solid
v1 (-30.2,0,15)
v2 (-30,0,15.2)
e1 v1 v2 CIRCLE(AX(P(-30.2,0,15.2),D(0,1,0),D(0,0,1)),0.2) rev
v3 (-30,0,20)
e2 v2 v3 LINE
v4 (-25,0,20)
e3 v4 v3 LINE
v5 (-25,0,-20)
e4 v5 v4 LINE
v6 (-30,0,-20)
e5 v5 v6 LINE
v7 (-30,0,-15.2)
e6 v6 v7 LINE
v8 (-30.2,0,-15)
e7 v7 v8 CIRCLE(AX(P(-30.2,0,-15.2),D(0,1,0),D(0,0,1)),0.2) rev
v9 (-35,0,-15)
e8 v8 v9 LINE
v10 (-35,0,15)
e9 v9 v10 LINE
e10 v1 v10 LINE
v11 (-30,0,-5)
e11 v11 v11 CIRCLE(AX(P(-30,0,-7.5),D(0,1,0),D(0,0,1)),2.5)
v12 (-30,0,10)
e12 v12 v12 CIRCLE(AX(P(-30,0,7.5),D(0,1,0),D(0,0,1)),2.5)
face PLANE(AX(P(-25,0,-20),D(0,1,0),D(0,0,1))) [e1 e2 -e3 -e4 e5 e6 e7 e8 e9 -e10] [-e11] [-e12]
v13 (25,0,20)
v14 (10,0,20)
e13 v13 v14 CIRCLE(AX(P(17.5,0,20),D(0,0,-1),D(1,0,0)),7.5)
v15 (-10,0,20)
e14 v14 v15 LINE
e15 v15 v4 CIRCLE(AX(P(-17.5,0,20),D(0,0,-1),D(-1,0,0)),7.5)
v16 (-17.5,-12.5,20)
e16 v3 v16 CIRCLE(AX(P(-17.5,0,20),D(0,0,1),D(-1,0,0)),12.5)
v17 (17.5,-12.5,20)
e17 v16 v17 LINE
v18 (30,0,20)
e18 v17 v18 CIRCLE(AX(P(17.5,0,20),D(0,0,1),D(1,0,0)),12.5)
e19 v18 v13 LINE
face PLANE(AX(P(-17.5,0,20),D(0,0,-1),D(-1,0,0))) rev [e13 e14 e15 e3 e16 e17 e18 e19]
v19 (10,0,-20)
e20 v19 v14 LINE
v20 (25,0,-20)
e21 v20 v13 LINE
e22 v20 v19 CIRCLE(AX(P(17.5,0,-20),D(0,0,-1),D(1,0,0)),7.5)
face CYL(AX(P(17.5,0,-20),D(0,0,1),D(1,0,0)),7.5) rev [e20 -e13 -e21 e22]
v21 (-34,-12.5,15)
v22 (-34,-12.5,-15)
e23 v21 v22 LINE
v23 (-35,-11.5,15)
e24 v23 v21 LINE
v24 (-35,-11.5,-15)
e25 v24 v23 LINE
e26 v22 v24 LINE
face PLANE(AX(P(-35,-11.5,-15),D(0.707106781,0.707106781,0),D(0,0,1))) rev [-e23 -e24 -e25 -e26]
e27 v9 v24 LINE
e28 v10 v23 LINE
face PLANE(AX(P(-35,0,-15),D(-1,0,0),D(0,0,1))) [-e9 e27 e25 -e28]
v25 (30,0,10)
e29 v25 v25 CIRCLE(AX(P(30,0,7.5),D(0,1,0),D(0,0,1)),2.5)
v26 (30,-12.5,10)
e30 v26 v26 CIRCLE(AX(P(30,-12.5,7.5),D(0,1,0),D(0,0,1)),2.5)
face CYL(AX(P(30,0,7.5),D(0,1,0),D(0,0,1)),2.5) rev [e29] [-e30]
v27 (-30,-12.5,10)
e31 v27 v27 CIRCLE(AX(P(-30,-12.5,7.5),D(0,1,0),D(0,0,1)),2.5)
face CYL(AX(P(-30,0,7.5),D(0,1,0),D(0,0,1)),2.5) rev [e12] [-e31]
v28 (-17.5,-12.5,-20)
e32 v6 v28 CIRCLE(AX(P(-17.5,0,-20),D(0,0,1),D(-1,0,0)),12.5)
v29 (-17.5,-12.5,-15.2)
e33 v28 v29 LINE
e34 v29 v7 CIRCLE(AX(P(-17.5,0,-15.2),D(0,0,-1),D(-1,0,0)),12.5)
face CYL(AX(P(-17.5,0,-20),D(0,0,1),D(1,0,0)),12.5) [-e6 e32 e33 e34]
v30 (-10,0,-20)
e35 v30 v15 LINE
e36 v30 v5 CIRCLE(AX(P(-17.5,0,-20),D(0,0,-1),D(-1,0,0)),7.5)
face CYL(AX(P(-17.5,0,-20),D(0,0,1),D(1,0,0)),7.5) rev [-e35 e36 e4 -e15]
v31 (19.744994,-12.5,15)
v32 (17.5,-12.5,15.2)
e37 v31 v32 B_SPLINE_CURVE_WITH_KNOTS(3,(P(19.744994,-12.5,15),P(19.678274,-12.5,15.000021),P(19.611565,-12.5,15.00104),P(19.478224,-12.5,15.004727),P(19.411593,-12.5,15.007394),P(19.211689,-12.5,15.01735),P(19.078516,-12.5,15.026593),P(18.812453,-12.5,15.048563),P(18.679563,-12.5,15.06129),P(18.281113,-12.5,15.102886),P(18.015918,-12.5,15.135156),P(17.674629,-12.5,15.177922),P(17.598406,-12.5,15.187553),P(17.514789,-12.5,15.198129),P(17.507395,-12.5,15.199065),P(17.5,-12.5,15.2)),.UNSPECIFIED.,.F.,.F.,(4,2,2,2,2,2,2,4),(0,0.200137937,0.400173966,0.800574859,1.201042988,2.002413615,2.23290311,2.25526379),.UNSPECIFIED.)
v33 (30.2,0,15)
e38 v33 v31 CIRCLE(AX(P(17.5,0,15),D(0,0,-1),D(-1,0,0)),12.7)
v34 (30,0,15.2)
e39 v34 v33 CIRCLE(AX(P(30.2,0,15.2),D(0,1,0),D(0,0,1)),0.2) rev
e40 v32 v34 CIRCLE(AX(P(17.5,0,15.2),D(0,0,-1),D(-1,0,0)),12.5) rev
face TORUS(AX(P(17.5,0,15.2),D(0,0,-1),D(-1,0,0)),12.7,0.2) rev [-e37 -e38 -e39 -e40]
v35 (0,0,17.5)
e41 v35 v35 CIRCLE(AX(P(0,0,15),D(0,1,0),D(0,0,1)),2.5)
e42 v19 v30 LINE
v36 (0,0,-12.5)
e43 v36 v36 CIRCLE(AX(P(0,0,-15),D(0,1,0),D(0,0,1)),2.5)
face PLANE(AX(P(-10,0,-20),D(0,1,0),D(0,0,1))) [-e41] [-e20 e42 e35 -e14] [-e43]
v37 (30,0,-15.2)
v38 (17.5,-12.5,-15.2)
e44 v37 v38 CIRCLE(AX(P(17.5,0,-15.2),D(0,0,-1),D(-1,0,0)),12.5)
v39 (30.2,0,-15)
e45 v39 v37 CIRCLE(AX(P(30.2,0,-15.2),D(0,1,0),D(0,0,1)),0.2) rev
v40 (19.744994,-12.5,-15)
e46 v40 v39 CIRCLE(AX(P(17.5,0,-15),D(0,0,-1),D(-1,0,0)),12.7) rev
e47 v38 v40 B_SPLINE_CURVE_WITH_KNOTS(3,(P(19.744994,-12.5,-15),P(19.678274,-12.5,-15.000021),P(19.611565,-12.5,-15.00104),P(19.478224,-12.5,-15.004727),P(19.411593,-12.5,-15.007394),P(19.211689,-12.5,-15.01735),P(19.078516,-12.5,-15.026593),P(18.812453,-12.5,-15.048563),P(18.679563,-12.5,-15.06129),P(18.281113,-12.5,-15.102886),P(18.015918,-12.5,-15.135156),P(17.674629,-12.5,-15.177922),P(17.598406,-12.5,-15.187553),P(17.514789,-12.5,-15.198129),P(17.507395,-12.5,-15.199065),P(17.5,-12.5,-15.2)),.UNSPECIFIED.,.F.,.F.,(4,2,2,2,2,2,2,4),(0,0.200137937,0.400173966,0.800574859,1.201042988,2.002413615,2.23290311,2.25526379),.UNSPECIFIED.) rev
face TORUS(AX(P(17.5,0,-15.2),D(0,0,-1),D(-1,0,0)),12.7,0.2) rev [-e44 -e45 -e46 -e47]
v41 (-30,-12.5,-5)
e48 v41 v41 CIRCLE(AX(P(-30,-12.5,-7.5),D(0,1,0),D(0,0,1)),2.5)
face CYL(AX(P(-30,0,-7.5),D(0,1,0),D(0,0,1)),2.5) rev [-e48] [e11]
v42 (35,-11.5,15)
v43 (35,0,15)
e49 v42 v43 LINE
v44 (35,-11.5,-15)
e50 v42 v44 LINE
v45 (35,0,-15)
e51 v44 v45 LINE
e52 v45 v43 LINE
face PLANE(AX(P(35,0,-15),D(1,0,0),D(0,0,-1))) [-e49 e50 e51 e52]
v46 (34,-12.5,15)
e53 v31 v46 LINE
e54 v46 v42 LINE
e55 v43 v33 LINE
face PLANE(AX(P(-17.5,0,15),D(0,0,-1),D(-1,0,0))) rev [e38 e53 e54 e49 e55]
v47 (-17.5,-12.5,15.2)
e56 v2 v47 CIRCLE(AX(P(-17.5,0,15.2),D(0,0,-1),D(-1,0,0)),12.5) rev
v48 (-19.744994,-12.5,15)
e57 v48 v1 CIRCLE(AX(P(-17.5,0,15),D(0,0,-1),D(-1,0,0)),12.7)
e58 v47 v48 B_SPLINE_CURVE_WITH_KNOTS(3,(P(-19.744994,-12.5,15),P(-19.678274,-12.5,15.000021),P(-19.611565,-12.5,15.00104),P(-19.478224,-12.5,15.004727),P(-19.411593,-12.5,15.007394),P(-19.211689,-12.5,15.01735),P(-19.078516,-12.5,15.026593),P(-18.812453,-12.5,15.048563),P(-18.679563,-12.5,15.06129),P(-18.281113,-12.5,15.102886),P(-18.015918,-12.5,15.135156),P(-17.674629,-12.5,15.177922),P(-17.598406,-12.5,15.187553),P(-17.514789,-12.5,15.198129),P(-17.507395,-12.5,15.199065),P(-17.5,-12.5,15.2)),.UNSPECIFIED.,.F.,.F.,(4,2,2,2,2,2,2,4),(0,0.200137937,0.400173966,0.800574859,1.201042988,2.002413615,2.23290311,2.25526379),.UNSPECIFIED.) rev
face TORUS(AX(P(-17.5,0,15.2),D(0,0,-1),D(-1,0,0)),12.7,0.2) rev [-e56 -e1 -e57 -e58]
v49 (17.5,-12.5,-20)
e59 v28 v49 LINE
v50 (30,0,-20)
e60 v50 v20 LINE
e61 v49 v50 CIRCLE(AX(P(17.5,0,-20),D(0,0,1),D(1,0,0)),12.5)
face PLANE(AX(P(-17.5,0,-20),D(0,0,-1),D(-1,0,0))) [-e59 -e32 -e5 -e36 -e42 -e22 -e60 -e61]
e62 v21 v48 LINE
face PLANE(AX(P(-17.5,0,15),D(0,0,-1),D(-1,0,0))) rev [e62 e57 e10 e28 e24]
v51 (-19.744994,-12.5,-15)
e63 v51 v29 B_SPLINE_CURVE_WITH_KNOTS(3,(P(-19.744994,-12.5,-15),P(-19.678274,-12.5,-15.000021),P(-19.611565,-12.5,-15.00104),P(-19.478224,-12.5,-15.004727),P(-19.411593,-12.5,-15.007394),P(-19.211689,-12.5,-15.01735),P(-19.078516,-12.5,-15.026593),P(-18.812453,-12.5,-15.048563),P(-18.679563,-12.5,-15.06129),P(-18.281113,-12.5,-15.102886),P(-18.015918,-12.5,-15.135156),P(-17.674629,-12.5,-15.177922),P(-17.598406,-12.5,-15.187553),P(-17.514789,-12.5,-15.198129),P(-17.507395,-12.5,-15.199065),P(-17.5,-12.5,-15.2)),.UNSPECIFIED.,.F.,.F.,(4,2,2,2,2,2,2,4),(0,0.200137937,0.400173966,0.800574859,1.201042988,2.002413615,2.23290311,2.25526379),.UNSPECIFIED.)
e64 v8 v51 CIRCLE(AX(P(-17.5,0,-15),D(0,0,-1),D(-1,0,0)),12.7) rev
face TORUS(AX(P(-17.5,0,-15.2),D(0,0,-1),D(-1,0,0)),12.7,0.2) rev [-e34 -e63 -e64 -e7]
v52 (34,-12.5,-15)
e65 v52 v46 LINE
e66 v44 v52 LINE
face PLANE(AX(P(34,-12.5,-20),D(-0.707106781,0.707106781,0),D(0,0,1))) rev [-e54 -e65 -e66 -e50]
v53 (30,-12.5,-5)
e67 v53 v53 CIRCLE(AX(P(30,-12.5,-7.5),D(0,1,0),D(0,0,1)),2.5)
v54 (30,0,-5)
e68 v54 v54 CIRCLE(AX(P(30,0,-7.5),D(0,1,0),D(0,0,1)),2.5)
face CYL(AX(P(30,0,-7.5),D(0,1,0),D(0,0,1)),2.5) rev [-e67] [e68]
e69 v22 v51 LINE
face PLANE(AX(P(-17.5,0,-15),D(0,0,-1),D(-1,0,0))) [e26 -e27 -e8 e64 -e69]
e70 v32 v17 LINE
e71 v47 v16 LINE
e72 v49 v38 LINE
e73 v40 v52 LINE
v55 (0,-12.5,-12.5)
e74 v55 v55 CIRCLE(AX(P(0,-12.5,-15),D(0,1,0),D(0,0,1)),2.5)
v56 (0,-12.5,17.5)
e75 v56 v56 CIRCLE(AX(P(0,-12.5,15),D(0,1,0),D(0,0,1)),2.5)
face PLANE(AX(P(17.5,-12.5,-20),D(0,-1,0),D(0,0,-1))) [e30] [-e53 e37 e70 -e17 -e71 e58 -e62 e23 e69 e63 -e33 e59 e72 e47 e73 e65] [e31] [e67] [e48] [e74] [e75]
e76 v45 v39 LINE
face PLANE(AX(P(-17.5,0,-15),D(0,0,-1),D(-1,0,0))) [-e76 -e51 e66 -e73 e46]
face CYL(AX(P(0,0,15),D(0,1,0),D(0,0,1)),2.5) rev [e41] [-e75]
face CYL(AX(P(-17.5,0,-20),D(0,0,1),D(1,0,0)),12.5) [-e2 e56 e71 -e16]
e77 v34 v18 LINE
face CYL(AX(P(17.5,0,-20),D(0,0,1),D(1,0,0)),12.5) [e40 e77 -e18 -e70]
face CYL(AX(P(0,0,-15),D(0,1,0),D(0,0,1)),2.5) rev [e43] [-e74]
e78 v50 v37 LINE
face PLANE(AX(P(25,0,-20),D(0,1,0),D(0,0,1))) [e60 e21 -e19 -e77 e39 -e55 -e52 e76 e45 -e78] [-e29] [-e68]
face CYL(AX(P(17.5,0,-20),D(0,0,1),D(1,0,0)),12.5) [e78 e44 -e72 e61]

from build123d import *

# Parameters (mm, degrees)
EXTRUDE_1_DEPTH      = 20
EXTRUDE_1_DEPTH_BACK = 20
EXTRUDE_2_DEPTH      = 15
EXTRUDE_2_DEPTH_BACK = 15
CHAMFER_1_SIZE       = 1
HOLE_WIZARD_5_0_1_D  = 5
FILLET_1_R           = 0.2


with BuildPart() as part:
    # Эскиз1 → Бобышка-Вытянуть1 (new, two sides: drawn at the far end of the back side and taken through both)
    with BuildSketch(Plane.XY.offset(-EXTRUDE_1_DEPTH_BACK)):
        with BuildLine():
            Line((17.5, -12.5), (-17.5, -12.5))
            ThreePointArc((-17.5, -12.5), (-26.338834764831844, -8.838834764831844), (-30.000000000000004, 0))
            Line((-30.000000000000004, 0), (-25, 0))
            ThreePointArc((-25, 0), (-17.5, -7.499999999999998), (-10.000000000000002, 0))
            Line((-10.000000000000002, 0), (10.000000000000002, 0))
            ThreePointArc((10.000000000000002, 0), (17.5, -7.499999999999998), (25, 0))
            Line((25, 0), (30.000000000000004, 0))
            ThreePointArc((30.000000000000004, 0), (26.338834764831844, -8.838834764831843), (17.5, -12.5))
        make_face()
    extrude(amount=EXTRUDE_1_DEPTH + EXTRUDE_1_DEPTH_BACK)

    # Эскиз2 → Бобышка-Вытянуть2 (add, two sides: drawn at the far end of the back side and taken through both)
    with BuildSketch(Plane.XY.offset(-EXTRUDE_2_DEPTH_BACK)):
        with BuildLine():
            Line((30.000000000000004, 0), (35, 0))
            Line((35, 0), (35, -12.499999999999996))
            Line((35, -12.499999999999996), (17.5, -12.5))
            Line((17.5, -12.5), (-17.500000000000004, -12.5))
            Line((-17.500000000000004, -12.5), (-35, -12.499999999999996))
            Line((-35, -12.499999999999996), (-35, 0))
            Line((-35, 0), (-30.000000000000004, 1.53e-15))
            Line((-30.000000000000004, 1.53e-15), (-25, 9.2e-16))
            ThreePointArc((-25, 9.2e-16), (-17.5, -7.499999999999998), (-10.000000000000002, 0))
            Line((-10.000000000000002, 0), (10.000000000000002, 9.2e-16))
            ThreePointArc((10.000000000000002, 9.2e-16), (17.5, -7.499999999999998), (25, 0))
            Line((25, 0), (30.000000000000004, 0))
        make_face()
    extrude(amount=EXTRUDE_2_DEPTH + EXTRUDE_2_DEPTH_BACK)

    # Фаска1
    chamfer_1_edges = [part.edges().sort_by_distance(p)[0] for p in [
        (35, -12.499999999999996, 0),
        (-35, -12.499999999999996, 0),
    ]]
    chamfer(chamfer_1_edges, length=CHAMFER_1_SIZE)

    # Отверстия под штифты Ø5.0 мм1 (through all)
    with Locations(Plane(origin=(0, 0, 0), x_dir=(1, 0, 0), z_dir=(0, 1, 0))):
        with Locations((0, 15), (0, -15), (-30, -7.5), (-30, 7.5), (30, 7.5), (30, -7.5)):
            Hole(HOLE_WIZARD_5_0_1_D / 2)

    # Скругление1
    # the kernel refuses this fillet: 0.2 mm, written as the material it adds along each edge
    with BuildSketch(Plane(origin=(-17.5, 4.44e-15, -15), x_dir=(0.19874807030113847, -0.9800506132601386, 0), z_dir=(0.9800506132601386, 0.19874807030113847, 0))) as fillet_1_piece_1_section:
        with BuildLine():
            CenterArc((12.500000000000004 + FILLET_1_R, FILLET_1_R), FILLET_1_R, 180, 90)
            Line((12.500000000000004, FILLET_1_R), (12.500000000000004, 0))
            Line((12.500000000000004, 0), (12.500000000000004 + FILLET_1_R, 0))
        make_face()
    fillet_1_piece_1 = revolve(axis=Axis((-17.5, 4.44e-15, -15), (0, 0, -1)), revolution_arc=101.46375913899153, mode=Mode.PRIVATE)
    fillet_1_piece_1 = split(fillet_1_piece_1, bisect_by=Plane(origin=(-17.5, -12.5, -15), z_dir=(0, 1, 0)), keep=Keep.TOP, mode=Mode.PRIVATE)
    add(fillet_1_piece_1)
    with BuildSketch(Plane(origin=(-17.5, 4.44e-15, 15), x_dir=(0.19874807030113847, -0.9800506132601386, 0), z_dir=(0.9800506132601386, 0.19874807030113847, 0))) as fillet_1_piece_2_section:
        with BuildLine():
            CenterArc((12.500000000000004 + FILLET_1_R, -FILLET_1_R), FILLET_1_R, 90, 90)
            Line((12.500000000000004, -FILLET_1_R), (12.500000000000004, 0))
            Line((12.500000000000004, 0), (12.500000000000004 + FILLET_1_R, 0))
        make_face()
    fillet_1_piece_2 = revolve(axis=Axis((-17.5, 4.44e-15, 15), (0, 0, -1)), revolution_arc=101.46375913899153, mode=Mode.PRIVATE)
    fillet_1_piece_2 = split(fillet_1_piece_2, bisect_by=Plane(origin=(-17.5, -12.5, 15), z_dir=(0, 1, 0)), keep=Keep.TOP, mode=Mode.PRIVATE)
    add(fillet_1_piece_2)
    with BuildSketch(Plane(origin=(17.499999999999993, 1.199e-14, 15), x_dir=(1, -9.6e-16, 0), z_dir=(9.6e-16, 1, 0))) as fillet_1_piece_3_section:
        with BuildLine():
            CenterArc((12.50000000000001 + FILLET_1_R, -FILLET_1_R), FILLET_1_R, 90, 90)
            Line((12.50000000000001 + FILLET_1_R, 0), (12.50000000000001, 0))
            Line((12.50000000000001, 0), (12.50000000000001, -FILLET_1_R))
        make_face()
    fillet_1_piece_3 = revolve(axis=Axis((17.499999999999993, 1.199e-14, 15), (0, 0, -1)), revolution_arc=101.46375913899143, mode=Mode.PRIVATE)
    fillet_1_piece_3 = split(fillet_1_piece_3, bisect_by=Plane(origin=(17.499999999999993, -12.5, 15), z_dir=(0, 1, 0)), keep=Keep.TOP, mode=Mode.PRIVATE)
    add(fillet_1_piece_3)
    with BuildSketch(Plane(origin=(17.499999999999993, 1.199e-14, -15), x_dir=(1, -9.6e-16, 0), z_dir=(9.6e-16, 1, 0))) as fillet_1_piece_4_section:
        with BuildLine():
            CenterArc((12.50000000000001 + FILLET_1_R, FILLET_1_R), FILLET_1_R, 180, 90)
            Line((12.50000000000001 + FILLET_1_R, 0), (12.50000000000001, 0))
            Line((12.50000000000001, 0), (12.50000000000001, FILLET_1_R))
        make_face()
    fillet_1_piece_4 = revolve(axis=Axis((17.499999999999993, 1.199e-14, -15), (0, 0, -1)), revolution_arc=101.46375913899143, mode=Mode.PRIVATE)
    fillet_1_piece_4 = split(fillet_1_piece_4, bisect_by=Plane(origin=(17.499999999999993, -12.5, -15), z_dir=(0, 1, 0)), keep=Keep.TOP, mode=Mode.PRIVATE)
    add(fillet_1_piece_4)


solid = part.part
